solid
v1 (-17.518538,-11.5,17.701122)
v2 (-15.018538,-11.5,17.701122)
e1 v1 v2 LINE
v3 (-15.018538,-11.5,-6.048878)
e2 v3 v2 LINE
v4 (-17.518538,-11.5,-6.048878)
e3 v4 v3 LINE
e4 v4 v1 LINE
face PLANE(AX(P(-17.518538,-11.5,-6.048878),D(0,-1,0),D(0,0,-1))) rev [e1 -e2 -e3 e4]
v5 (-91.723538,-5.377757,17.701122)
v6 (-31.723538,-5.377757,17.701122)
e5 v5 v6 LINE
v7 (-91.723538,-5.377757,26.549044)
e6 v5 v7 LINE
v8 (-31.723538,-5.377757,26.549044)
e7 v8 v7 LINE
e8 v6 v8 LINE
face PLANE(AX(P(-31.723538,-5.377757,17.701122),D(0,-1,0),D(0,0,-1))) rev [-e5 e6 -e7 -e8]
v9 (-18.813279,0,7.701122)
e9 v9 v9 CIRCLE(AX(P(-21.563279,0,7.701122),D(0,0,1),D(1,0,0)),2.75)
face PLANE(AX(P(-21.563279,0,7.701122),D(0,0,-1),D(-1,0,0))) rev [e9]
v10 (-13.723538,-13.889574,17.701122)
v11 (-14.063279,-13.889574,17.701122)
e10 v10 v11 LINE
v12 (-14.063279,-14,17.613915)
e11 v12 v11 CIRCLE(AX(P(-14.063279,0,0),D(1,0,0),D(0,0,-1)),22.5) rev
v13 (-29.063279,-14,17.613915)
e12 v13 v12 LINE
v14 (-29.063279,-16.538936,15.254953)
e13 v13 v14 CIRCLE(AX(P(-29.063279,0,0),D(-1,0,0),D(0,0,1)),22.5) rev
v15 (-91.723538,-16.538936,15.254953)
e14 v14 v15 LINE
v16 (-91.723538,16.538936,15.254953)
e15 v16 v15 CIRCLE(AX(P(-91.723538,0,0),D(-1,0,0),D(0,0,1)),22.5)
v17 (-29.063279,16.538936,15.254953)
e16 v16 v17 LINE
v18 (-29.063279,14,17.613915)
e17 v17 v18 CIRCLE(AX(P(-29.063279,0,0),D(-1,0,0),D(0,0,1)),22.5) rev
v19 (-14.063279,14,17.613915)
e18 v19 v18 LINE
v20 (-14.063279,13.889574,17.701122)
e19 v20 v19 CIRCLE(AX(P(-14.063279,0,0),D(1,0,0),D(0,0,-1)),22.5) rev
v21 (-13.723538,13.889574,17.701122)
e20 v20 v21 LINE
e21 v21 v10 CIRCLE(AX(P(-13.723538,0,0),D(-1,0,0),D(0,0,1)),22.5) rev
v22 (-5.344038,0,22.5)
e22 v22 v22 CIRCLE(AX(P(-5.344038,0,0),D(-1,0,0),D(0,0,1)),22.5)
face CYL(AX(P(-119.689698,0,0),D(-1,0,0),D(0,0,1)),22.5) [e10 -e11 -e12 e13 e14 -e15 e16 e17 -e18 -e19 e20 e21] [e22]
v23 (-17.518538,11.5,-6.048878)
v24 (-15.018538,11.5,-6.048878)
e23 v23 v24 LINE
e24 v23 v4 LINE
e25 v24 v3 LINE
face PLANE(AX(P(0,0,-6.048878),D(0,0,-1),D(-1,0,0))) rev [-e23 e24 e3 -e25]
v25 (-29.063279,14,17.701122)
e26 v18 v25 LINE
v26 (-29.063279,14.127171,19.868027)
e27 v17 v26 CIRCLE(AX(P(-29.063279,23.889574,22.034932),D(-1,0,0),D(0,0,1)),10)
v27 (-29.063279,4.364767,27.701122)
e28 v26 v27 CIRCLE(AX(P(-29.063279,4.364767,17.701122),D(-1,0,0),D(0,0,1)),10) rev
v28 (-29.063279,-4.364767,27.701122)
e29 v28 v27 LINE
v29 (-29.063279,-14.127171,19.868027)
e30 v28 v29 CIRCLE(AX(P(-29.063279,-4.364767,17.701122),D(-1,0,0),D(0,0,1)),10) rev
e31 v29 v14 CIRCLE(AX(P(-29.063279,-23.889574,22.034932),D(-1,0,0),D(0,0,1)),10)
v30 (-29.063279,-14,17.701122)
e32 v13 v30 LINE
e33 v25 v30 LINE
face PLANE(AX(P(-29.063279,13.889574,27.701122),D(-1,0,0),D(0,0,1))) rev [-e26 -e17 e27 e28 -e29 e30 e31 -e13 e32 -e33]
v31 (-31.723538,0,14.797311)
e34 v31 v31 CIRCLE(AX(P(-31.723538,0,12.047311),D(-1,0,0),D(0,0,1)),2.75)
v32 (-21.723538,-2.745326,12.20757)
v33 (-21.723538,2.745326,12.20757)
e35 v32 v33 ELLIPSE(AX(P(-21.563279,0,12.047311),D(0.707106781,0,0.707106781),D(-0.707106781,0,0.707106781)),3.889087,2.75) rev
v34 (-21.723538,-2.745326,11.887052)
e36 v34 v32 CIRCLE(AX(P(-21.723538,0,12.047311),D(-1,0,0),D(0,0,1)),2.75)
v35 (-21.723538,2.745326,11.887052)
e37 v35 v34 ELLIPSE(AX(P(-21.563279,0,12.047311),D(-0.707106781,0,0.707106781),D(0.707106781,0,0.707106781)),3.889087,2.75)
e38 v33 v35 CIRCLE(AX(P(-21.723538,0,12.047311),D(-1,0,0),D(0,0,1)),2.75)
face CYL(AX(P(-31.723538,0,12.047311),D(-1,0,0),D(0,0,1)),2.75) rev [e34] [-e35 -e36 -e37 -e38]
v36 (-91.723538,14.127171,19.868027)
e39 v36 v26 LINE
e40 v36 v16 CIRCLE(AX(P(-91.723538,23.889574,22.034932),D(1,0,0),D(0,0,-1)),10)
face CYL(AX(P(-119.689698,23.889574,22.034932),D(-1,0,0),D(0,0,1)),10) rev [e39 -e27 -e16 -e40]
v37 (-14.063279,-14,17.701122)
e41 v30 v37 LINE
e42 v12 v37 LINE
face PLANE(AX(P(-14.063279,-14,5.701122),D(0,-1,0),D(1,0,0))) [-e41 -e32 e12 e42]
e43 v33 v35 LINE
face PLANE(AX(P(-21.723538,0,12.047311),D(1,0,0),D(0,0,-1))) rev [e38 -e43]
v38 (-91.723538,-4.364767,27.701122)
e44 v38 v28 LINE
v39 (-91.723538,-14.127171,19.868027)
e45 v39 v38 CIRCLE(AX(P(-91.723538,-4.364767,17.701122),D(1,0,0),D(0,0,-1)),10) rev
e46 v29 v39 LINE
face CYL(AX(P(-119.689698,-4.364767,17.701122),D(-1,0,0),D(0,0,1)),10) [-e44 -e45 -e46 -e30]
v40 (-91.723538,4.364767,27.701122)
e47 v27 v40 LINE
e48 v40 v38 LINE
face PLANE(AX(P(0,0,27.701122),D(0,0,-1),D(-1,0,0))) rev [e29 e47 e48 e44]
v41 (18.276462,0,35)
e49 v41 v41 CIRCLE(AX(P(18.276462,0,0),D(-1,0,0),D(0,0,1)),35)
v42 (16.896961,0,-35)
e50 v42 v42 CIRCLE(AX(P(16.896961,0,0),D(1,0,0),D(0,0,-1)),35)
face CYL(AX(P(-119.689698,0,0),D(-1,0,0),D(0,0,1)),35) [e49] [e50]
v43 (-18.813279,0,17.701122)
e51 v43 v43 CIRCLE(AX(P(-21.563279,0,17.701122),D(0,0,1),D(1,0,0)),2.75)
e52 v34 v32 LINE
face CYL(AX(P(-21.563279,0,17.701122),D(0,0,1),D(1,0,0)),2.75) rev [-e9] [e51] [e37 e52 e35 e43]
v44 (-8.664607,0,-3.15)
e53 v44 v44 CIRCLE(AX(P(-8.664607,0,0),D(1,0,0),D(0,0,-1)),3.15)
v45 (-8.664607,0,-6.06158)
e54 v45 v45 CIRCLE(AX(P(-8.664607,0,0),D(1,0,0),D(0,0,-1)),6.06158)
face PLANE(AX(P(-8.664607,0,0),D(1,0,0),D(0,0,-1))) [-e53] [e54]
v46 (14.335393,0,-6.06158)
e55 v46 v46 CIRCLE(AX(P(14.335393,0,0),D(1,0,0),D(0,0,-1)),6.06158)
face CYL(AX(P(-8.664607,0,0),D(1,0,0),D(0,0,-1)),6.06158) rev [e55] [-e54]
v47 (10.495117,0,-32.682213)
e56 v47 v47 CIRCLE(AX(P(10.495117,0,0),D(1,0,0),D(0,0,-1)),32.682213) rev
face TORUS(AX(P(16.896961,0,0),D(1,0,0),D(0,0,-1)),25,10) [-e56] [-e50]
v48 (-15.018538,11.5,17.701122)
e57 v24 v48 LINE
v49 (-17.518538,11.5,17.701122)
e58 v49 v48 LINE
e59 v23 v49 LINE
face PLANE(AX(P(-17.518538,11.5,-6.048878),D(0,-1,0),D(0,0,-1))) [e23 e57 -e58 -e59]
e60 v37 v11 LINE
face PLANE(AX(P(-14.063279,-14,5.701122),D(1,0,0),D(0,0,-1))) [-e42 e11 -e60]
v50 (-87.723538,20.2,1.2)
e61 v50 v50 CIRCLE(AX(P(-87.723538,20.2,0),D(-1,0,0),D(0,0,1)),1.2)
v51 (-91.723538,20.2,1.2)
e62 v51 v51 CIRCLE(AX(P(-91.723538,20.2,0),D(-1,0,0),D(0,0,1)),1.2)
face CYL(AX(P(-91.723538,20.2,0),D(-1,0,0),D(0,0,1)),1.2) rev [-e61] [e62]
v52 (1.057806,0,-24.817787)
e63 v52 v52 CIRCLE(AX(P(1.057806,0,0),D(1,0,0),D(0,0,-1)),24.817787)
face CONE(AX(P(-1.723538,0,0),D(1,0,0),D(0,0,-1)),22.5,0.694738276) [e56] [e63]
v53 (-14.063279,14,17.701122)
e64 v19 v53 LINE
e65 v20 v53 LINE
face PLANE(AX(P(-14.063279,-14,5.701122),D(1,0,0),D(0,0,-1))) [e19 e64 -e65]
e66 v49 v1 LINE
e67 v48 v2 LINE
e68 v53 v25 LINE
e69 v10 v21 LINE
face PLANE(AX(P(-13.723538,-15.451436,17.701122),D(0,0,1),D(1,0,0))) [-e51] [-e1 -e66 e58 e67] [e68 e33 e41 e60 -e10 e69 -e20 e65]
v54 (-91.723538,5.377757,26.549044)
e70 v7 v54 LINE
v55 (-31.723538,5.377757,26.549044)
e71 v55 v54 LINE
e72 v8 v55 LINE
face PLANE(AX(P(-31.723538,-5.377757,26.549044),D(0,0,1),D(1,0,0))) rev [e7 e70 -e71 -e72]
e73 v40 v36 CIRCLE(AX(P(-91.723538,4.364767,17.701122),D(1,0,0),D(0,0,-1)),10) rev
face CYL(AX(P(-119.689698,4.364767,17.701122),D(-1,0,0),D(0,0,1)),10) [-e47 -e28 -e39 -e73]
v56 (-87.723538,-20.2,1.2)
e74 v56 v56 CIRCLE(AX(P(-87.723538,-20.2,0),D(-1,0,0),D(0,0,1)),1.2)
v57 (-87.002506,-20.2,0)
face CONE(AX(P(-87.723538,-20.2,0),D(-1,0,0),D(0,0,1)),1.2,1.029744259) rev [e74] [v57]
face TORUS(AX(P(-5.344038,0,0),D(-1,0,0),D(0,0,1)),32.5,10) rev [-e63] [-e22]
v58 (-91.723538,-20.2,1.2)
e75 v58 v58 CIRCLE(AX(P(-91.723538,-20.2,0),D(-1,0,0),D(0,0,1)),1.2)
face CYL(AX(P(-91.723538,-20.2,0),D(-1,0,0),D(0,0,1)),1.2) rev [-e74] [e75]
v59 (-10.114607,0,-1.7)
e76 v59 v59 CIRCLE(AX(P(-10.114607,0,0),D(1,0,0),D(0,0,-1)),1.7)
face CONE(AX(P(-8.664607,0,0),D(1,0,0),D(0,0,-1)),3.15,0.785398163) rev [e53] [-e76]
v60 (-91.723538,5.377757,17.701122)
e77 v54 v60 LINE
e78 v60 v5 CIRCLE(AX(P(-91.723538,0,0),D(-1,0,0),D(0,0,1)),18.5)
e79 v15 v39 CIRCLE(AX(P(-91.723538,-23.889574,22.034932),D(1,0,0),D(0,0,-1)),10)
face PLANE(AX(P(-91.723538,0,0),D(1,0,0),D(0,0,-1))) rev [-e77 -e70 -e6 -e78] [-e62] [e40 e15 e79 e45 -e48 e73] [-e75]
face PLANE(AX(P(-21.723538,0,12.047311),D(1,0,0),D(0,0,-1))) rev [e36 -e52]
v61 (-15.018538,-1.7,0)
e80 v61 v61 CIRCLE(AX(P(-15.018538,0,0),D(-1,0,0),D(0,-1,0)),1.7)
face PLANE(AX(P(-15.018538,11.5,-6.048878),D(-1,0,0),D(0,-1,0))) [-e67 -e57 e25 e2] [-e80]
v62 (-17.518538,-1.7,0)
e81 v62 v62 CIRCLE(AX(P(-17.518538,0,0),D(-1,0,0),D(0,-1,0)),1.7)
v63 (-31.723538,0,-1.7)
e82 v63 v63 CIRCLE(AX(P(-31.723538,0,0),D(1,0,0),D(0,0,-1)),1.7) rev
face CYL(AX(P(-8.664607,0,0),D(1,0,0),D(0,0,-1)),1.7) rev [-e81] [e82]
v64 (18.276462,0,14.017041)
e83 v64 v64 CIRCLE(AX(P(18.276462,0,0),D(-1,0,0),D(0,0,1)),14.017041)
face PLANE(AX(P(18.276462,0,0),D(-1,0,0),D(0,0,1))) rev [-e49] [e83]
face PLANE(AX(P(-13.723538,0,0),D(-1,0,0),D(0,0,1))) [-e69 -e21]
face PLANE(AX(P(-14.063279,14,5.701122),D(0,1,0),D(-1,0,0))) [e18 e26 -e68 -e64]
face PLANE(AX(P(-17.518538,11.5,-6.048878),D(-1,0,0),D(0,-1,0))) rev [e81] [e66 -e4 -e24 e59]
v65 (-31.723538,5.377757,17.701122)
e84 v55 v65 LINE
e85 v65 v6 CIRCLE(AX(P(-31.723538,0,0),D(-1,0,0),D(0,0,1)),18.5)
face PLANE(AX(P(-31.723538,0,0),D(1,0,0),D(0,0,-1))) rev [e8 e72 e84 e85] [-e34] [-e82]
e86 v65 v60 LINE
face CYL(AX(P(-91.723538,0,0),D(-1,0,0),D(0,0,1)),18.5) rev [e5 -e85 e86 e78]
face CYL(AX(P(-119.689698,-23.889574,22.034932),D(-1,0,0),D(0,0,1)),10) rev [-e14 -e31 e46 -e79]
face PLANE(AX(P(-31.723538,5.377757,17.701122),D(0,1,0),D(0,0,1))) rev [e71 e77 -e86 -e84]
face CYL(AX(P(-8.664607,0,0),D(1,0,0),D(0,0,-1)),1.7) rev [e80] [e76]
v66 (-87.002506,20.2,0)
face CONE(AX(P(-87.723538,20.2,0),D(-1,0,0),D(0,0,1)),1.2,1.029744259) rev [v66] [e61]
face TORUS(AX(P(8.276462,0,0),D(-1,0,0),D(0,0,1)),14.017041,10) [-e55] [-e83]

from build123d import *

# Parameters (mm, degrees)
SCHIZZO3_W                             = 9.243109639
SCHIZZO3_H                             = 30.902871456
TAGLIO_ESTRUSIONE2_DEPTH               = 78
SCHIZZO4_W                             = 15
SCHIZZO4_H                             = 28
ESTRUSIONE_ESTRUSIONE1_DEPTH           = 12
FORO_PER_VITE_M4_2_D                   = 37
FORO_PER_VITE_M4_2_DEPTH               = 60
FORO_PER_VITE_M5_1_D                   = 5.5
FORO_PER_VITE_M5_1_DEPTH               = 10
FORO_PER_VITE_M5_2_D                   = 5.5
FORO_PER_VITE_M5_2_DEPTH               = 10
FORO_PER_VITE_M2_2_D                   = 2.4
FORO_PER_VITE_M2_2_DEPTH               = 4
FORO_PER_VITE_M2_2_TIP                 = 0.721032743
SCHIZZO28_W                            = 62.660258955
SCHIZZO28_H                            = 27.779148216
ESTRUSIONE_ESTRUSIONE7_DEPTH           = 10
SCHIZZO29_W                            = 8.847921359
SCHIZZO29_H                            = 10.755513732
TAGLIO_ESTRUSIONE5_DEPTH               = 60
RACCORDO20_R                           = 10
RACCORDO21_R                           = 10
RACCORDO22_R                           = 10
RACCORDO24_R                           = 10
RACCORDO25_R                           = 10
RACCORDO26_R                           = 10
RACCORDO27_R                           = 10
SCHIZZO30_R                            = 6.061580104
TAGLIO_ESTRUSIONE6_DEPTH               = 23
SCHIZZO31_W                            = 2.5
SCHIZZO31_H                            = 23
TAGLIO_ESTRUSIONE7_DEPTH               = 23.75
FORO_SVASATO_PER_VITE_M3_1_D           = 3.4
FORO_SVASATO_PER_VITE_M3_1_CSINK_D     = 6.3
FORO_SVASATO_PER_VITE_M3_1_CSINK_ANGLE = 90


with BuildPart() as part:
    # Schizzo2 → Rivoluzione2 (revolve)
    with BuildSketch(Plane(origin=(0, 0, 0), x_dir=(1, 0, 0), z_dir=(0, 1, 0)), mode=Mode.PRIVATE) as rivoluzione2_sk:
        Polygon((-91.723538337, 22.5), (-91.723538337, 0), (14.335392963, 0), (14.335392963, 6.061580104), (18.276461663, 6.061580104), (18.276461663, 35), (13.276461663, 35), (-1.723538337, 22.5), align=None)
    revolve(rivoluzione2_sk.sketch.rotate(Axis((-119.689698016, 0, 0), (1, 0, 0)), 180), axis=Axis((-119.689698016, 0, 0), (1, 0, 0)))

    # Schizzo3 → Taglio-Estrusione2 (cut)
    with BuildSketch(Plane.ZY.offset(91.723538337)):
        with Locations((22.322677132, 0)):
            Rectangle(SCHIZZO3_W, SCHIZZO3_H)
    extrude(amount=-TAGLIO_ESTRUSIONE2_DEPTH, mode=Mode.SUBTRACT)

    # Schizzo4 → Estrusione-Estrusione1 (add)
    with BuildSketch(Plane.XY.offset(17.701122312)):
        with Locations((-21.563279382, 0)):
            Rectangle(SCHIZZO4_W, SCHIZZO4_H)
    extrude(amount=-ESTRUSIONE_ESTRUSIONE1_DEPTH)

    # Foro per Vite M4-2
    with Locations(Plane.ZY.offset(91.723538337)):
        with Locations((0, 0)):
            Hole(FORO_PER_VITE_M4_2_D / 2, depth=FORO_PER_VITE_M4_2_DEPTH)

    # Foro per Vite M5-1
    with Locations(Plane.XY.offset(17.701122312)):
        with Locations((-21.563279382, 0)):
            Hole(FORO_PER_VITE_M5_1_D / 2, depth=FORO_PER_VITE_M5_1_DEPTH)

    # Foro per Vite M5-2
    with Locations(Plane.ZY.offset(31.723538337)):
        with Locations((12.047310847, 0)):
            Hole(FORO_PER_VITE_M5_2_D / 2, depth=FORO_PER_VITE_M5_2_DEPTH)

    # Foro per Vite M2-2
    with Locations(Plane.ZY.offset(91.723538337)):
        with Locations((0, 20.2), (0, -20.2)):
            Hole(FORO_PER_VITE_M2_2_D / 2, depth=FORO_PER_VITE_M2_2_DEPTH)
            with Locations((0, 0, -(FORO_PER_VITE_M2_2_DEPTH + FORO_PER_VITE_M2_2_TIP / 2))):  # 118° drill point
                Cone(0, FORO_PER_VITE_M2_2_D / 2, FORO_PER_VITE_M2_2_TIP, mode=Mode.SUBTRACT)

    # Schizzo28 → Estrusione-Estrusione7 (add)
    with BuildSketch(Plane.XY.offset(17.701122312)):
        with Locations((-60.39340886, 0)):
            Rectangle(SCHIZZO28_W, SCHIZZO28_H)
    extrude(amount=ESTRUSIONE_ESTRUSIONE7_DEPTH)

    # Schizzo29 → Taglio-Estrusione5 (cut)
    with BuildSketch(Plane.ZY.offset(91.723538337)):
        with Locations((22.125082992, 0)):
            Rectangle(SCHIZZO29_W, SCHIZZO29_H)
    extrude(amount=-TAGLIO_ESTRUSIONE5_DEPTH, mode=Mode.SUBTRACT)

    # Raccordo20
    # the kernel refuses this fillet: 10 mm, written as the material it takes off along each edge
    with BuildSketch(Plane(origin=(18.276461663, 0, 0), x_dir=(0, 0, 1), z_dir=(0, 1, 0))) as raccordo20_piece_1:
        with BuildLine():
            CenterArc((14.017040588, -10), RACCORDO20_R, 90, 52.706861747)
            Line((6.061580104, -3.9410687), (5.902470894, -3.819890074))
            ThreePointArc((5.902470894, -3.819890074), (5.861580104, -1.97053435), (5.861580104, 0))
            Line((5.861580104, 0), (6.061580104, 0.2))
            Line((6.061580104, 0.2), (14.017040588, 0.2))
            Line((14.017040588, 0.2), (14.017040588, 0))
        make_face()
    revolve(axis=Axis((18.276461663, 0, 0), (1, 0, 0)), mode=Mode.SUBTRACT)

    # Raccordo21
    raccordo21_edges = [part.edges().sort_by_distance(p)[0] for p in [
        (13.276461663, 0, -35),
    ]]
    fillet(raccordo21_edges, radius=RACCORDO21_R)

    # Raccordo22
    raccordo22_edges = [part.edges().sort_by_distance(p)[0] for p in [
        (-1.723538337, 0, -22.5),
    ]]
    fillet(raccordo22_edges, radius=RACCORDO22_R)

    # Raccordo24
    # the kernel refuses this fillet: 10 mm, written as the material it adds along each edge
    with BuildSketch(Plane(origin=(-29.063279382, 13.889574108, 17.701122312), x_dir=(0, 0.7347199128018105, -0.6783705843655811), z_dir=(-1, 0, 0))) as raccordo24_piece_1:
        with BuildLine():
            CenterArc((4.407269799, -9.967842465), RACCORDO24_R, 94.596163378, 42.687391022)
            Line((-2.939929329, -3.184136621), (0, 0))
            ThreePointArc((0, 0), (1.802974009, -0.072354454), (3.605948017, 0))
        make_face()
    extrude(amount=62.660258955)

    # Raccordo25
    raccordo25_edges = [part.edges().sort_by_distance(p)[0] for p in [
        (-60.393408859, 13.889574108, 27.701122312),
    ]]
    fillet(raccordo25_edges, radius=RACCORDO25_R)

    # Raccordo26
    # the kernel refuses this fillet: 10 mm, written as the material it adds along each edge
    with BuildSketch(Plane(origin=(-29.063279382, -13.889574108, 17.701122312), x_dir=(0, -0.7347199128018104, -0.6783705843655813), z_dir=(-1, 0, 0))) as raccordo26_piece_1:
        with BuildLine():
            CenterArc((4.407269799, 9.967842465), RACCORDO26_R, 222.7164456, 42.687391022)
            Line((-2.939929329, 3.184136621), (0, 0))
            ThreePointArc((0, 0), (1.802974009, 0.072354454), (3.605948017, 0))
        make_face()
    extrude(amount=62.660258955)

    # Raccordo27
    raccordo27_edges = [part.edges().sort_by_distance(p)[0] for p in [
        (-60.393408859, -13.889574108, 27.701122312),
    ]]
    fillet(raccordo27_edges, radius=RACCORDO27_R)

    # Schizzo30 → Taglio-Estrusione6 (cut)
    with BuildSketch(Plane(origin=(14.335392963, 0, 0), x_dir=(0, 0, -1), z_dir=(1, 0, 0))):
        Circle(SCHIZZO30_R)
    extrude(amount=-TAGLIO_ESTRUSIONE6_DEPTH, mode=Mode.SUBTRACT)

    # Schizzo31 → Taglio-Estrusione7 (cut)
    with BuildSketch(Plane.XY.offset(17.701122312)):
        with Locations((-16.268538337, 0)):
            Rectangle(SCHIZZO31_W, SCHIZZO31_H)
    extrude(amount=-TAGLIO_ESTRUSIONE7_DEPTH, mode=Mode.SUBTRACT)

    # Foro svasato per Vite M3-1 (through all)
    with Locations(Plane(origin=(-8.664607037, 0, 0), x_dir=(0, 0, -1), z_dir=(1, 0, 0))):
        with Locations((0, 0)):
            CounterSinkHole(FORO_SVASATO_PER_VITE_M3_1_D / 2, FORO_SVASATO_PER_VITE_M3_1_CSINK_D / 2, counter_sink_angle=FORO_SVASATO_PER_VITE_M3_1_CSINK_ANGLE)


solid = part.part
